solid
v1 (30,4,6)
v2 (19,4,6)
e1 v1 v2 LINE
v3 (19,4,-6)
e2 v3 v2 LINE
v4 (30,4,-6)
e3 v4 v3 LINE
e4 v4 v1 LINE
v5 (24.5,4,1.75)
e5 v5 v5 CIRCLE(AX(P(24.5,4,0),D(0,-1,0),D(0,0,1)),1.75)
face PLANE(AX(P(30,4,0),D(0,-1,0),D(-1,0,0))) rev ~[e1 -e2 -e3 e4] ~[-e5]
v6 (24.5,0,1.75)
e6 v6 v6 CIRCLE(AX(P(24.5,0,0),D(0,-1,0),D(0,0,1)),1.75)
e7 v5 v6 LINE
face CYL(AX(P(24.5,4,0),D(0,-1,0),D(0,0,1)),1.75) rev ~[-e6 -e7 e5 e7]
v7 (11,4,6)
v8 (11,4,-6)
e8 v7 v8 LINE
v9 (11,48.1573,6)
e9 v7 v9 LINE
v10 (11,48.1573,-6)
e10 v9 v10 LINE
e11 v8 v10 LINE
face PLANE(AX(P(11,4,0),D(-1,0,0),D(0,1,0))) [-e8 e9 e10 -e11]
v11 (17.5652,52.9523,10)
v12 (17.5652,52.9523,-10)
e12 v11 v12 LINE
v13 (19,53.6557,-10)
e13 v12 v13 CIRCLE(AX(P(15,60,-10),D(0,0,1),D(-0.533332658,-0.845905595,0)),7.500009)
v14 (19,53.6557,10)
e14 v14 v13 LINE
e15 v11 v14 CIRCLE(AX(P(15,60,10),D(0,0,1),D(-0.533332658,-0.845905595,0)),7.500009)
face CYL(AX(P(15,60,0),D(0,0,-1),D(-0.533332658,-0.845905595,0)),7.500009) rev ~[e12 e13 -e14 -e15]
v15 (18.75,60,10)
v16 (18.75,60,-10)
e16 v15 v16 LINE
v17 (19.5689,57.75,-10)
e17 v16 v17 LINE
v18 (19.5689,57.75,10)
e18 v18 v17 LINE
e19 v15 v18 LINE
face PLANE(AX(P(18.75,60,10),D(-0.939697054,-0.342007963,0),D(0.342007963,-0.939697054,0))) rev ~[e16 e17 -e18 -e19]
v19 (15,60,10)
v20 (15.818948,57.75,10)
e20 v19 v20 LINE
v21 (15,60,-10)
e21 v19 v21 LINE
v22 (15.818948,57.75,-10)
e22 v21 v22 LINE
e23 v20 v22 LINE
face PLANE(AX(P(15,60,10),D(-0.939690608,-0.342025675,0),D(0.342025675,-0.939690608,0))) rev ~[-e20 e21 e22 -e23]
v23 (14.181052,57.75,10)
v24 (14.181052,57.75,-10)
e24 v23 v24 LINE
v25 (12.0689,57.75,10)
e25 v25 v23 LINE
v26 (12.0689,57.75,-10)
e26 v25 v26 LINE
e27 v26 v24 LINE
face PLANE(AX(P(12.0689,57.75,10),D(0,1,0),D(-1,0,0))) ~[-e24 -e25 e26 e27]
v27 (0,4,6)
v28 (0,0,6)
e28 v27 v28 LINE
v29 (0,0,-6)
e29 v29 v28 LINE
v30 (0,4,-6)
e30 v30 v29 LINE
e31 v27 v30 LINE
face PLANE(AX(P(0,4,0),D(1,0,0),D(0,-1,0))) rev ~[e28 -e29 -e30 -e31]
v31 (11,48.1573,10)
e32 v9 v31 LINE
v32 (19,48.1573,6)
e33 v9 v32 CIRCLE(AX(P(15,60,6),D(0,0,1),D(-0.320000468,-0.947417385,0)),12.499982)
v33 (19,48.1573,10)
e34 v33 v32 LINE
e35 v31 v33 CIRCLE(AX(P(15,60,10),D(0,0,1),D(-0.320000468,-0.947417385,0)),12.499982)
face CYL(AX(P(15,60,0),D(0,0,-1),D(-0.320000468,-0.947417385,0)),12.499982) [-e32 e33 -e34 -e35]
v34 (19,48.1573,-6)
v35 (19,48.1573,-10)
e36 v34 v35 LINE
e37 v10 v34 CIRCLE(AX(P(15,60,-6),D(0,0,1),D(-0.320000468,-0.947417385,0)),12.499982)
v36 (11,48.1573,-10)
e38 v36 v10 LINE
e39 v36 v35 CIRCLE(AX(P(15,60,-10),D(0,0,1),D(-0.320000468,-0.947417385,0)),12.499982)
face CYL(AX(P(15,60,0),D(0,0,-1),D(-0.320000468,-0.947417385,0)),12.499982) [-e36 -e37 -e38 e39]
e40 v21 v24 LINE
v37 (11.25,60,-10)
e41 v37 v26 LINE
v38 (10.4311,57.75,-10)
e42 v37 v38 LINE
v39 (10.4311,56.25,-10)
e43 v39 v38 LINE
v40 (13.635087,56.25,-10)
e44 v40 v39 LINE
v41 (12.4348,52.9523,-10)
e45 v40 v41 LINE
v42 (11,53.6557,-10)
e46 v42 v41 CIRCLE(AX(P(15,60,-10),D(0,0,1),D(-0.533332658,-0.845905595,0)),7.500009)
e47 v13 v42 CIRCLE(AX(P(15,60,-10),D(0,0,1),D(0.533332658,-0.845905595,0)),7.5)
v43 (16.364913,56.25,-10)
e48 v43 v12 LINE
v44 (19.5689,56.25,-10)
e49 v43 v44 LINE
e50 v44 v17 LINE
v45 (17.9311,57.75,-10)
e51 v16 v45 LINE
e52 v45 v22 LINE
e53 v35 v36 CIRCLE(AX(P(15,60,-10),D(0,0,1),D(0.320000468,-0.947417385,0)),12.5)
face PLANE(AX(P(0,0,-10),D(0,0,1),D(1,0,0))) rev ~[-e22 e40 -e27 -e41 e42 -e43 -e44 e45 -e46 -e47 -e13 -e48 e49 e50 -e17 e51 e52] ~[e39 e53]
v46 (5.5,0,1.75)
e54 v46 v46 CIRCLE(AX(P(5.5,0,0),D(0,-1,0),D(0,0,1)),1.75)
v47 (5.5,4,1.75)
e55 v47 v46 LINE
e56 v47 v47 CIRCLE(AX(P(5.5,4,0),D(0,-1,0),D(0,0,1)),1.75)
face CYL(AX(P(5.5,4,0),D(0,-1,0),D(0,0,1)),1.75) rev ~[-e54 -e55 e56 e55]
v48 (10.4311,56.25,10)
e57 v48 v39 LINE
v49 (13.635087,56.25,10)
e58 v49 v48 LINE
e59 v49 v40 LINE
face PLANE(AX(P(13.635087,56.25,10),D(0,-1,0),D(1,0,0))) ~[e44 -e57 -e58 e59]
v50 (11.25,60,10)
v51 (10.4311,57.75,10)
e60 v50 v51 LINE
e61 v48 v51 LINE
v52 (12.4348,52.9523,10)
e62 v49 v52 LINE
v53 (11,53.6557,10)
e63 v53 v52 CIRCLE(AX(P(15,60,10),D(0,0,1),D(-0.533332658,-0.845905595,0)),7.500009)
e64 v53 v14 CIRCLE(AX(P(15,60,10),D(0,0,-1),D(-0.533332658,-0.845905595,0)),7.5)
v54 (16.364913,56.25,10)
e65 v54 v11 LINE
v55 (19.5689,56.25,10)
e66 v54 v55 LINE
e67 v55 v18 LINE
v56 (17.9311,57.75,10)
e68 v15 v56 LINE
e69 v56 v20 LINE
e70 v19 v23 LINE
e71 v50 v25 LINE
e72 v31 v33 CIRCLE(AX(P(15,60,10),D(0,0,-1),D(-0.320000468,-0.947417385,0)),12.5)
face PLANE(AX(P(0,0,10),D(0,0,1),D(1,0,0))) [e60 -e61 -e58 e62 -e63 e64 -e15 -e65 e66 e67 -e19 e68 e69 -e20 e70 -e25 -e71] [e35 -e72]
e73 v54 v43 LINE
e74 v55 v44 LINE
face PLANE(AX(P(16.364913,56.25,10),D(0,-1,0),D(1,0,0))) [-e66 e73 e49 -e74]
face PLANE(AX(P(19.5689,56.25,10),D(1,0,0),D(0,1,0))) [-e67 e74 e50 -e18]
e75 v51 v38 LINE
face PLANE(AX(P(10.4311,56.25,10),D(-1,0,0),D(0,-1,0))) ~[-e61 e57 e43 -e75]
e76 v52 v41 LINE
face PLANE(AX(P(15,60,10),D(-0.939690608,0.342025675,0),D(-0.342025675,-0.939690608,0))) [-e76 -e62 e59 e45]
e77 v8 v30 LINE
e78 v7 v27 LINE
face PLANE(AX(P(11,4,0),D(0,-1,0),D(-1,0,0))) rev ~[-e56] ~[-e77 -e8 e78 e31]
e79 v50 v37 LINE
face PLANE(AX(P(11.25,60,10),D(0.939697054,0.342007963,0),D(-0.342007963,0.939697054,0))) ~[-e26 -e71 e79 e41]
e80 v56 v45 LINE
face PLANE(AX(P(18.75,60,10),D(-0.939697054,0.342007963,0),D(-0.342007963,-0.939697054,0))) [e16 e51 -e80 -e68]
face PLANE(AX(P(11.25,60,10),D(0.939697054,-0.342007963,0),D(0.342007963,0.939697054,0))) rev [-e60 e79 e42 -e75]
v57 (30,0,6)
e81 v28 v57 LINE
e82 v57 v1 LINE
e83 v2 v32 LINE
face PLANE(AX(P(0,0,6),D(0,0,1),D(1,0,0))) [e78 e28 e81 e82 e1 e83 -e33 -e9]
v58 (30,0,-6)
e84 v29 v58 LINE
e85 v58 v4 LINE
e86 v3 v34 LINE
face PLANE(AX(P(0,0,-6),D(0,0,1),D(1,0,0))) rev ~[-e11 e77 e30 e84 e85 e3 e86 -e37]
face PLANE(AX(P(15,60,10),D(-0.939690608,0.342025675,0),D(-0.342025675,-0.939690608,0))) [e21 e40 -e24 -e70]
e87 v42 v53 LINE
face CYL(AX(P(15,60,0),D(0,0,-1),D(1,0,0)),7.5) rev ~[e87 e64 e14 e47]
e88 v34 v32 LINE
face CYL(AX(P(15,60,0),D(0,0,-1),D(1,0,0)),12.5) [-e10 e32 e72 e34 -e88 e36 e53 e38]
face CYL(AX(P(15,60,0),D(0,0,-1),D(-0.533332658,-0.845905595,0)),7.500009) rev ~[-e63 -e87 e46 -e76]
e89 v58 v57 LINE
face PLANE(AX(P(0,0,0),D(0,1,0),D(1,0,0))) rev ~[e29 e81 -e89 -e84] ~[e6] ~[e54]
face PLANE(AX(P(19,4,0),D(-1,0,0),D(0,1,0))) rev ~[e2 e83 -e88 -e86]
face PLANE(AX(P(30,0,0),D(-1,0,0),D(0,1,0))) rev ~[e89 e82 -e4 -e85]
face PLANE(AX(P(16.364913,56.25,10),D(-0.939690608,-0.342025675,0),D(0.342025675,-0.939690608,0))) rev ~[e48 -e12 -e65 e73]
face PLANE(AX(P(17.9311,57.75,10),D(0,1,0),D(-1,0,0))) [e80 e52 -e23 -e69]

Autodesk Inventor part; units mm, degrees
ref_plane "YZ Plane" through (0, 0, 0) normal (1, 0, 0) x (0, 1, 0)
ref_plane "XZ Plane" through (0, 0, 0) normal (0, 1, 0) x (-1, 0, 0)
ref_plane "XY Plane" through (0, 0, 0) normal (0, 0, 1) x (1, 0, 0)
sketch "Sketch1" plane through (0, 0, 0) normal (0, 0, 1) x (1, 0, 0)
  line L0 (0, 0) -> (30, 0)
  line L1 (30, 0) -> (30, 4)
  line L2 (30, 4) -> (0, 4)
  line L3 (0, 4) -> (0, 0)
  line L4 (15, 4) -> (11, 4)
  line L5 (15, 4) -> (19, 4)
  line L6 (11, 4) -> (11, 60)
  line L7 (19, 4) -> (19, 60)
  line L8 (11, 60) -> (19, 60)
  circle A0 centre (15, 60) radius 7.5
  circle A1 centre (15, 60) radius 12.5
  arc A2 (11, 48.1573) -> (19, 48.1573) centre (15, 60) ccw
  arc A3 (11, 53.6557) -> (19, 53.6557) centre (15, 60) ccw
  dimension "d0" = 30
  dimension "d1" = 4
  dimension "d2" = 4
  dimension "d3" = 4
  dimension "d5" = 60
  dimension "d6" = 15
  dimension "d7" = 25
extrude "Extrusion1" add sketch "Sketch1" along normal mid plane 12 contours L3 L2 L1 L0 | L6 A1 L7 L2
extrude "Extrusion2" add sketch "Sketch1" along normal mid plane 20 contours A1 L7 A0 L6 | L6 A0 L7 A1
sketch "Sketch2" plane through (19, 4, 6) normal (0, 1, 0) x (1, 0, 0)
  line L0 (0, 12) -> (0, 0) projected
  line L1 (11, 0) -> (0, 0) projected
  line L2 (11, 12) -> (11, 0) projected
  line L3 (0, 12) -> (11, 12) projected
  line L4 (0, 6) -> (11, 6)
  point P0 (-19, 6)
  point P1 (5.5, 6)
hole "Hole1" at (24.5, 4, 0) direction (0, -1, 0) diameter 3.5 end up to surface
ref_plane "Work Plane1" through (15, 4, -6) normal (-1, 0, 0) x (0, 0, 1)
mirror "Mirror1" about plane through (15, 4, -6) normal (-1, 0, 0) of "Hole1"
sketch "Sketch3" plane through (15, 60, 10) normal (0, 0, 1) x (1, 0, 0)
  circle A0 centre (0, 0) radius 7.5 projected
  line L0 (0, 0) -> (2.5652, -7.0477)
  line L1 (0, 0) -> (-2.5652, -7.0477)
  line L2 (0, -74.5) -> (0, 27) projected
  line L3 (0, -7.5) -> (0, -2.25)
  line L4 (0, 0) -> (-7.5, 0)
  line L5 (7.5, 0) -> (0, 0)
  line L6 (3.75, 0) -> (4.5689, -2.25)
  line L7 (0, -3.75) -> (4.5689, -3.75)
  line L8 (4.5689, -3.75) -> (4.5689, -2.25)
  line L9 (2.9311, -2.25) -> (0, -2.25)
  line L10 (0, -2.25) -> (0, -3.75)
  line L11 (3.75, 0) -> (2.9311, -2.25)
  arc A1 (-2.5652, -7.0477) -> (2.5652, -7.0477) centre (0, 0) ccw
  point P0 (-15, -60)
  point P1 (-3.75, 0)
  dimension "d19" = 20
  dimension "d20" = 20
  dimension "d21" = 70
  dimension "d22" = 1.5
  dimension "d23" = 70
  dimension "d24" = 4.5689
  dimension "d25" = 2.9311
extrude "Extrusion3" add sketch "Sketch3" against normal up to surface (20 mm away) contours L1 L2 A0 | L0 L9 L2 | L2 L7 L0 A0 | L9 L11 L6 L8 L7 L0 | L0 L7 L2 L9
mirror "Mirror2" about plane through (15, 4, -6) normal (-1, 0, 0) of "Extrusion3"
equation "\"d2\" = d3"
equation "\"d20\" = d19"
equation "\"d23\" = d21"
properties part number "frontSight"
